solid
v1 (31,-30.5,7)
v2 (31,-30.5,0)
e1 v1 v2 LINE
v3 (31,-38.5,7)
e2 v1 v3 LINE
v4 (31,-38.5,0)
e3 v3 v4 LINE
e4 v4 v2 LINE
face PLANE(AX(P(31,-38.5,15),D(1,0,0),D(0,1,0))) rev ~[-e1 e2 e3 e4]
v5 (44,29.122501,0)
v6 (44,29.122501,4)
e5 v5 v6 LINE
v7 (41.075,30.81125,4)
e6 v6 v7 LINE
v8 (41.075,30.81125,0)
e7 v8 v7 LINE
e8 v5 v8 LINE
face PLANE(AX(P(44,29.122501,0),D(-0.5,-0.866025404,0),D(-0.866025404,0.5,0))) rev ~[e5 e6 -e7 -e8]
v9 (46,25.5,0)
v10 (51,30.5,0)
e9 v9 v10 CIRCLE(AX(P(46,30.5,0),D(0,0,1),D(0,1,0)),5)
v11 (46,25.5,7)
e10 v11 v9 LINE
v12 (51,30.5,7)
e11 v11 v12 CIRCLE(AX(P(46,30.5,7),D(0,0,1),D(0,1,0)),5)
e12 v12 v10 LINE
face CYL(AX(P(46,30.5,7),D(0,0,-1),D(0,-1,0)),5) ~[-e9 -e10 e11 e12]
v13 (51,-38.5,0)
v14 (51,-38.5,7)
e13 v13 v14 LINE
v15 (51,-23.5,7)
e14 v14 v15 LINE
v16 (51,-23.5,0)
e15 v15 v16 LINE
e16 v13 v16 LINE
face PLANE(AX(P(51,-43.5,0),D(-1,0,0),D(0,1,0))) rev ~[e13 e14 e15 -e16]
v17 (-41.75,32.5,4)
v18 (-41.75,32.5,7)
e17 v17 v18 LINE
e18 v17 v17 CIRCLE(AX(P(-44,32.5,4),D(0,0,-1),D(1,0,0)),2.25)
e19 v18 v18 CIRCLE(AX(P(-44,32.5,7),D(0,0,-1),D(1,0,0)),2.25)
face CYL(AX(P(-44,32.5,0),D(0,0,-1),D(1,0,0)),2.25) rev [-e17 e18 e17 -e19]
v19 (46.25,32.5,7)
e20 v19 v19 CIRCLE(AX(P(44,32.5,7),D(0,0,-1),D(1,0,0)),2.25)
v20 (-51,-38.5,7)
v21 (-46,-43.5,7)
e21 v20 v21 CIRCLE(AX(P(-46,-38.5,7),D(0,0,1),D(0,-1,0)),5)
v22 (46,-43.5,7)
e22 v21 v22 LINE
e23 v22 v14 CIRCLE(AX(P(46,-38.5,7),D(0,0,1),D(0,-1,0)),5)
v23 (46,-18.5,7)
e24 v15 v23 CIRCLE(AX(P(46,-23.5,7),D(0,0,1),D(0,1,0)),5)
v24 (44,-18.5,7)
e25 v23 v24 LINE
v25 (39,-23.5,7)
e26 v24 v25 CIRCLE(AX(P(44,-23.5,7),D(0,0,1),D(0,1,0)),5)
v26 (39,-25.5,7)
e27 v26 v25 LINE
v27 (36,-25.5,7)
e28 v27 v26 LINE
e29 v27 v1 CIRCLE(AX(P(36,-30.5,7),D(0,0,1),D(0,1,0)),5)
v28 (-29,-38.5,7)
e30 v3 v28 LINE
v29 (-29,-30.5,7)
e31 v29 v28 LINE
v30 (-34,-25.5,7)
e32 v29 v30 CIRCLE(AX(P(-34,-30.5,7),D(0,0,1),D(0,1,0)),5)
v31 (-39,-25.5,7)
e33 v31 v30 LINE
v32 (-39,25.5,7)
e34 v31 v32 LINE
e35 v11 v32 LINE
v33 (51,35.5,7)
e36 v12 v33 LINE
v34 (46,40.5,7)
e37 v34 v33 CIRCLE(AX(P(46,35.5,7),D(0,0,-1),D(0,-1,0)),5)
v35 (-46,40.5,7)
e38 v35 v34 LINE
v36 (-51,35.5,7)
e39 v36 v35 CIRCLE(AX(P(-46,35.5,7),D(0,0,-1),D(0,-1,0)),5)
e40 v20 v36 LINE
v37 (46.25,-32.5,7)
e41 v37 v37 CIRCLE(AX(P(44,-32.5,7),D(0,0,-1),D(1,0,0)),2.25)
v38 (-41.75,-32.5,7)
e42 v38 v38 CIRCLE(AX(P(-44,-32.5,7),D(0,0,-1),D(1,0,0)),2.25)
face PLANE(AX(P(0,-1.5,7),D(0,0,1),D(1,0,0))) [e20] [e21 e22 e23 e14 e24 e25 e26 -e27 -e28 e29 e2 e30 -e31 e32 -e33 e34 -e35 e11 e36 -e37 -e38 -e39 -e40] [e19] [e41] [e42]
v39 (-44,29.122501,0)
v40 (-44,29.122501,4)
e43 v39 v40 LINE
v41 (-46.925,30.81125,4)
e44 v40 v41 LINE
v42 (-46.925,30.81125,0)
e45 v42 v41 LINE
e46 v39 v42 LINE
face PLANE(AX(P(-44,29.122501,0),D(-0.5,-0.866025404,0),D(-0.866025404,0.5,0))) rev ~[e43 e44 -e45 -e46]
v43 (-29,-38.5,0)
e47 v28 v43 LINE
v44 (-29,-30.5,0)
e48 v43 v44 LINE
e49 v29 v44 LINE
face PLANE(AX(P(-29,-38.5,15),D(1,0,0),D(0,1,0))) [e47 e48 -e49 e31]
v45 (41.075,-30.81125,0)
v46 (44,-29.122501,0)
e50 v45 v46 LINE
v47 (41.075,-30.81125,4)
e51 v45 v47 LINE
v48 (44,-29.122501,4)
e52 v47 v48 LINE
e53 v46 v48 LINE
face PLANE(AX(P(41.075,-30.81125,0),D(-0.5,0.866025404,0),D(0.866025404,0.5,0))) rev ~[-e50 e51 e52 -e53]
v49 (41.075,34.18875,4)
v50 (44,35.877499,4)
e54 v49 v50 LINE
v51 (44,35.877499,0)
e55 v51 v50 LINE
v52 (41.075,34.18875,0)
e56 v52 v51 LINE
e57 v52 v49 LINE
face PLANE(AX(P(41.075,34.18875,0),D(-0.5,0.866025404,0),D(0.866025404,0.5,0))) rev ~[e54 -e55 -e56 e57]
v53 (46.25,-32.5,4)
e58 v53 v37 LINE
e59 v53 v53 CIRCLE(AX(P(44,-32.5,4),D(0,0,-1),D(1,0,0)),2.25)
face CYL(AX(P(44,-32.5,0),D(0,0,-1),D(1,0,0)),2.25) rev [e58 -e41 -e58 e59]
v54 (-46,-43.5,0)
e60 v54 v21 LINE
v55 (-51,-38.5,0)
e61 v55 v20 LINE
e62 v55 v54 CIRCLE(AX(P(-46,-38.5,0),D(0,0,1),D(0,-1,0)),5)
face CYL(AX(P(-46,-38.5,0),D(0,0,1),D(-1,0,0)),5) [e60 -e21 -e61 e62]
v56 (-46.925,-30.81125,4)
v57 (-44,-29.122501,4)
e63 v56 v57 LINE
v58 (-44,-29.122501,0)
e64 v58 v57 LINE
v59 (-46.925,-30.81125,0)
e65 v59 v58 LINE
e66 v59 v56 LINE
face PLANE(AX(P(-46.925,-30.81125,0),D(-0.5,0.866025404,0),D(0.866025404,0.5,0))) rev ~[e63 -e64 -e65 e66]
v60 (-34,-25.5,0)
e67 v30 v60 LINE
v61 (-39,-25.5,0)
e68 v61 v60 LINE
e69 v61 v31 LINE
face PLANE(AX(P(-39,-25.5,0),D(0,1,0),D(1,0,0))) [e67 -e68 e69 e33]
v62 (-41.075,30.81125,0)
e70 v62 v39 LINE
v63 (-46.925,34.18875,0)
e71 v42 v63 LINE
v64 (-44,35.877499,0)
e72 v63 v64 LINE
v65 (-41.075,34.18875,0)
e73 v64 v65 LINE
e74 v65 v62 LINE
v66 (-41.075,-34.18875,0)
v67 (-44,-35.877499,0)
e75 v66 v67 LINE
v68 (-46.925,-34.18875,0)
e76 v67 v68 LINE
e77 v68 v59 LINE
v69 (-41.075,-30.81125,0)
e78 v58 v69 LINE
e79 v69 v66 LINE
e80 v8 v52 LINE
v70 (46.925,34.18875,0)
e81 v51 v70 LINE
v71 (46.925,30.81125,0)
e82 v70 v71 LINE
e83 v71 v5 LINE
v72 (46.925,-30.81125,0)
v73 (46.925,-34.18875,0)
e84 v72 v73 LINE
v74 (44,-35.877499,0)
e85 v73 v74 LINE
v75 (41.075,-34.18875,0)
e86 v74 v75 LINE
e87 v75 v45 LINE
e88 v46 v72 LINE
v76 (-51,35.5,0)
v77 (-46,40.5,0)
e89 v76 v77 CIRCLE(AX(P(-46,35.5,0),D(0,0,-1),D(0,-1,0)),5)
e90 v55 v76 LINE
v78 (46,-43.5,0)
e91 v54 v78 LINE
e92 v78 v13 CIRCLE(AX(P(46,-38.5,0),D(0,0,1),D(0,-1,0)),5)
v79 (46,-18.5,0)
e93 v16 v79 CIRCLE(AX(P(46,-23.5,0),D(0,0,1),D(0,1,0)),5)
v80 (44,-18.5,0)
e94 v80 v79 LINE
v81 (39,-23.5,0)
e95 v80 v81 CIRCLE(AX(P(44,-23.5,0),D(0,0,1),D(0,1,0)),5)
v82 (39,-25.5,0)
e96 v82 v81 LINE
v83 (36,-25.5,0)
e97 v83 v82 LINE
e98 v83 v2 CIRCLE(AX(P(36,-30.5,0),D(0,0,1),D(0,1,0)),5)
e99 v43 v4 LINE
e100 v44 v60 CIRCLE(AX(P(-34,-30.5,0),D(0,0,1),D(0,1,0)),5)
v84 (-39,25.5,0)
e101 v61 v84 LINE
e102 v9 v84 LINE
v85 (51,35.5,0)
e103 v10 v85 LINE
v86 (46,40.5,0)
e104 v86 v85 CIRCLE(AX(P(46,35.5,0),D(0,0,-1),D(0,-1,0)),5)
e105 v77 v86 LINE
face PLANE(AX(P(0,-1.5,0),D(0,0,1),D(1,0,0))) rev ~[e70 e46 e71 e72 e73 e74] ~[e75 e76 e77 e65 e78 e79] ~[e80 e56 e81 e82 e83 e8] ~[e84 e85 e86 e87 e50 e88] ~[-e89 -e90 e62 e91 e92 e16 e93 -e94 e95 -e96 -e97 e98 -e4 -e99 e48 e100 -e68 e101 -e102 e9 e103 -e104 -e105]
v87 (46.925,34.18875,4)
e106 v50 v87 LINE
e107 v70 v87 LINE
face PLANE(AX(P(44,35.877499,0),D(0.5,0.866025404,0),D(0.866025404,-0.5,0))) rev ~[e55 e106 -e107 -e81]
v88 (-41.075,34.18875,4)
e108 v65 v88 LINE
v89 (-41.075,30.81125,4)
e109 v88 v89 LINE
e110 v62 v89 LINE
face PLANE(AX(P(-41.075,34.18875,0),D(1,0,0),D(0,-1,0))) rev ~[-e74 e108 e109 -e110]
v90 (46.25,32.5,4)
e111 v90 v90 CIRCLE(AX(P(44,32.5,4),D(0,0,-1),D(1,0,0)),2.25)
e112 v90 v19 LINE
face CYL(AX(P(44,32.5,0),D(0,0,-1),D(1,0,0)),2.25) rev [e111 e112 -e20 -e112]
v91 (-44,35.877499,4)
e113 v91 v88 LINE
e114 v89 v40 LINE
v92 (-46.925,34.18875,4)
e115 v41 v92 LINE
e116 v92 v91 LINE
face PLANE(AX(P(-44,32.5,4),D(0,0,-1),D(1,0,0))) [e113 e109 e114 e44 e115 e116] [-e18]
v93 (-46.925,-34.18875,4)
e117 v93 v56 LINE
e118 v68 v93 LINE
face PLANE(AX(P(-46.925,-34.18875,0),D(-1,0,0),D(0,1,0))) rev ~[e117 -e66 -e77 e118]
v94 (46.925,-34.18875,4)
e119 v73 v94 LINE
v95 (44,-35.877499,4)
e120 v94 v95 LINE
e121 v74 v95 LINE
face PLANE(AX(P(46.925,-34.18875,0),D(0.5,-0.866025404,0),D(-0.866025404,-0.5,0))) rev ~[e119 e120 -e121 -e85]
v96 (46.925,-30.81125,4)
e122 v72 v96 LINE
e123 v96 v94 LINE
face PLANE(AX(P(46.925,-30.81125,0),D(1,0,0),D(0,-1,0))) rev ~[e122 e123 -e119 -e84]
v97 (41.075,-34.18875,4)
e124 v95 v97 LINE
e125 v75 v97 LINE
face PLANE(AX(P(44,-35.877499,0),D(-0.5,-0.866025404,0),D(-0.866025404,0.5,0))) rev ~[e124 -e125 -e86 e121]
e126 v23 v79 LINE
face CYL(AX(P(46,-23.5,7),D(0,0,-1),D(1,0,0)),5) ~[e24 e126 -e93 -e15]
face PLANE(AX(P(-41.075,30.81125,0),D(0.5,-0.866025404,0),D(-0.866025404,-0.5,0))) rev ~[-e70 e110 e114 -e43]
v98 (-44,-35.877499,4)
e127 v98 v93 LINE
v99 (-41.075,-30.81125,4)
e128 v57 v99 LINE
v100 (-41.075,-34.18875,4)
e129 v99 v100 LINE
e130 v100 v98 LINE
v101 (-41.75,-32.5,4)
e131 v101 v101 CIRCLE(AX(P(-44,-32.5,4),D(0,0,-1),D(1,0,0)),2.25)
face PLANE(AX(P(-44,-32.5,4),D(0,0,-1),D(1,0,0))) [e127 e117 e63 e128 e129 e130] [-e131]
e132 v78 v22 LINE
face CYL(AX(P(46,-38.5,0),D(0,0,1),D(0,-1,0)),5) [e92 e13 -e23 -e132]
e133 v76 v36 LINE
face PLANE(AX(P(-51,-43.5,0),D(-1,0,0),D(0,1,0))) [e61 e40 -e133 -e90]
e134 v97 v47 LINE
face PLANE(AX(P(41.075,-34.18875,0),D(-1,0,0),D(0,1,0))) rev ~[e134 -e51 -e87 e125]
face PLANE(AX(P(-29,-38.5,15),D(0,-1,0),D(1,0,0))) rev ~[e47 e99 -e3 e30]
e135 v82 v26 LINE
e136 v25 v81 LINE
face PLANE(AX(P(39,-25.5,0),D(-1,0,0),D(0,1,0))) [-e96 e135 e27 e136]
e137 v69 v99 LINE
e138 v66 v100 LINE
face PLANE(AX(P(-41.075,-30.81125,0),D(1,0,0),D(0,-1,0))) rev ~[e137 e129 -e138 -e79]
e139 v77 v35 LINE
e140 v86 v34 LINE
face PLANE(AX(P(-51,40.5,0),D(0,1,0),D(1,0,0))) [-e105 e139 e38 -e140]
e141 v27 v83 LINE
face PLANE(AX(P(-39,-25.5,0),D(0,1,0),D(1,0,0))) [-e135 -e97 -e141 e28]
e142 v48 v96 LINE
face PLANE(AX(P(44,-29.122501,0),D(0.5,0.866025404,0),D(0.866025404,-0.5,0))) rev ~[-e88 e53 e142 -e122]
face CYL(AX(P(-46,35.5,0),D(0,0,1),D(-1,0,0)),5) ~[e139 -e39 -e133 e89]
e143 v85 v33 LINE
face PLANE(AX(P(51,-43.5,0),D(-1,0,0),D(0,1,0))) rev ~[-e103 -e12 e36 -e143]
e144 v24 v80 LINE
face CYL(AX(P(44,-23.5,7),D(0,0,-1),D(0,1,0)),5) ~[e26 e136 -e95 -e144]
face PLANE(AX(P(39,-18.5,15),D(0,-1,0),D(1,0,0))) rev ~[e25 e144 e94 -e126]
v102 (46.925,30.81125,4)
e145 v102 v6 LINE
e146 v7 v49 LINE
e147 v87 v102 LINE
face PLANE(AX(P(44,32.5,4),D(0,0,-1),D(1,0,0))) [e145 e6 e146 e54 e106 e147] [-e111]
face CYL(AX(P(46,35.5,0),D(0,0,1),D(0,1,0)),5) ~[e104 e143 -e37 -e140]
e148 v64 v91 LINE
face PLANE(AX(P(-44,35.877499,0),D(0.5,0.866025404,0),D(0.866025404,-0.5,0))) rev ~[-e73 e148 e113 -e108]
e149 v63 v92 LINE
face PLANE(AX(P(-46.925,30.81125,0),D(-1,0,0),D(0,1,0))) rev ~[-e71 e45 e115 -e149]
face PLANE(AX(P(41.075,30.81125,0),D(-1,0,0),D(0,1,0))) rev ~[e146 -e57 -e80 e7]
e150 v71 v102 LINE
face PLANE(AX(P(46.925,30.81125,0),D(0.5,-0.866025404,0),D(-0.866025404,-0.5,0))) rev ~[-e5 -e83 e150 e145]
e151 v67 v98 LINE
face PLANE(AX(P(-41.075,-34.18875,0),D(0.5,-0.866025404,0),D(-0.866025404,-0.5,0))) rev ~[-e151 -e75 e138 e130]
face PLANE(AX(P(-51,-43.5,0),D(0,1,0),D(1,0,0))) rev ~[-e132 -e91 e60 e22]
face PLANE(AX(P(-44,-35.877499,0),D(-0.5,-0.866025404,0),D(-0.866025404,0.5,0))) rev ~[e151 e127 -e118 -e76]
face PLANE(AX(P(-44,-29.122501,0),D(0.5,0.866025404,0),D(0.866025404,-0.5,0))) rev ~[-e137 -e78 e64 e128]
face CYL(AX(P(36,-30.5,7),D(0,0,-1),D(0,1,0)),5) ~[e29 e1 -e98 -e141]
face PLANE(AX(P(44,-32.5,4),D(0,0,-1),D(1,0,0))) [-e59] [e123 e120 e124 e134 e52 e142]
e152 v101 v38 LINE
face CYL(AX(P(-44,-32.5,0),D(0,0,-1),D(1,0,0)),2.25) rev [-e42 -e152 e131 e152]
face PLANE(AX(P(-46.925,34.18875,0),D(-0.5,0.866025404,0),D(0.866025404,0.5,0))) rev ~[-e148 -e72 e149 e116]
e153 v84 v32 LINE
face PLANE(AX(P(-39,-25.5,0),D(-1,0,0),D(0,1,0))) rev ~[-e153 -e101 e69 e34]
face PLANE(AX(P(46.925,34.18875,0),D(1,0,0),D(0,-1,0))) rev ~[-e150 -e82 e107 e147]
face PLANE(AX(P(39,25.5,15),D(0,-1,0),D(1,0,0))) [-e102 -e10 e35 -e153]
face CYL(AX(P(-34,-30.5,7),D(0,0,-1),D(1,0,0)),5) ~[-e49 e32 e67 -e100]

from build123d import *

# Parameters (mm, degrees)
F0_W     = 102
F0_H     = 84
F0_R     = 2.25
F0_W_2   = 78
F0_H_2   = 51
F1_DEPTH = 15
F3_DEPTH = 4
F4_W     = 12
F4_H     = 44
F4_W_2   = 60
F4_H_2   = 13
F5_DEPTH = 15.001
F6_W     = 102
F6_H     = 84
F7_DEPTH = 8
F8_R     = 5


with BuildPart() as f1:
    # F0 (on Top) → F1 (new body)
    with BuildSketch(Plane.XY):
        with Locations((0, -1.5)):
            Rectangle(F0_W, F0_H)
        with Locations((-44, -32.5)):
            Circle(F0_R, mode=Mode.SUBTRACT)
        with Locations((44, -32.5)):
            Circle(F0_R, mode=Mode.SUBTRACT)
        with Locations((-44, 32.5)):
            Circle(F0_R, mode=Mode.SUBTRACT)
        Rectangle(F0_W_2, F0_H_2, mode=Mode.SUBTRACT)
        with Locations((44, 32.5)):
            Circle(F0_R, mode=Mode.SUBTRACT)
    extrude(amount=F1_DEPTH)

    # F2 (on face) → F3 (cut)
    with BuildSketch(Plane(origin=(0, 0, 0), x_dir=(1, 0, 0), z_dir=(0, 0, -1))):
        Polygon((-41.075, 30.8112504626), (-41.075, 34.1887495374), (-44, 35.8774990748), (-46.925, 34.1887495374), (-46.925, 30.8112504626), (-44, 29.1225009252), align=None)
        Polygon((41.075, 34.1887495374), (41.075, 30.8112504626), (44, 29.1225009252), (46.925, 30.8112504626), (46.925, 34.1887495374), (44, 35.8774990748), align=None)
        Polygon((41.075, -30.8112504626), (41.075, -34.1887495374), (44, -35.8774990748), (46.925, -34.1887495374), (46.925, -30.8112504626), (44, -29.1225009252), align=None)
        Polygon((-41.075, -34.1887495374), (-41.075, -30.8112504626), (-44, -29.1225009252), (-46.925, -30.8112504626), (-46.925, -34.1887495374), (-44, -35.8774990748), align=None)
    extrude(amount=-F3_DEPTH, mode=Mode.SUBTRACT)

    # F4 (on face) → F5 (cut, through all)
    with BuildSketch(Plane.XY.offset(15)):
        with Locations((45, 3.5)):
            Rectangle(F4_W, F4_H)
        with Locations((1, -32)):
            Rectangle(F4_W_2, F4_H_2)
    extrude(amount=-F5_DEPTH, mode=Mode.SUBTRACT)

    # F6 (on face) → F7 (cut)
    with BuildSketch(Plane.XY.offset(15)):
        with Locations((0, -1.5)):
            Rectangle(F6_W, F6_H)
    extrude(amount=-F7_DEPTH, mode=Mode.SUBTRACT)

    # F8
    f8_edges = [f1.edges().sort_by_distance(p)[0] for p in [
        (-51, 40.5, 3.5),
        (51, 40.5, 3.5),
        (-51, -43.5, 3.5),
        (51, -43.5, 3.5),
        (51, 25.5, 3.5),
        (51, -18.5, 3.5),
        (39, -18.5, 3.5),
        (31, -25.5, 3.5),
        (-29, -25.5, 3.5),
    ]]
    fillet(f8_edges, radius=F8_R)


solid = f1.part
